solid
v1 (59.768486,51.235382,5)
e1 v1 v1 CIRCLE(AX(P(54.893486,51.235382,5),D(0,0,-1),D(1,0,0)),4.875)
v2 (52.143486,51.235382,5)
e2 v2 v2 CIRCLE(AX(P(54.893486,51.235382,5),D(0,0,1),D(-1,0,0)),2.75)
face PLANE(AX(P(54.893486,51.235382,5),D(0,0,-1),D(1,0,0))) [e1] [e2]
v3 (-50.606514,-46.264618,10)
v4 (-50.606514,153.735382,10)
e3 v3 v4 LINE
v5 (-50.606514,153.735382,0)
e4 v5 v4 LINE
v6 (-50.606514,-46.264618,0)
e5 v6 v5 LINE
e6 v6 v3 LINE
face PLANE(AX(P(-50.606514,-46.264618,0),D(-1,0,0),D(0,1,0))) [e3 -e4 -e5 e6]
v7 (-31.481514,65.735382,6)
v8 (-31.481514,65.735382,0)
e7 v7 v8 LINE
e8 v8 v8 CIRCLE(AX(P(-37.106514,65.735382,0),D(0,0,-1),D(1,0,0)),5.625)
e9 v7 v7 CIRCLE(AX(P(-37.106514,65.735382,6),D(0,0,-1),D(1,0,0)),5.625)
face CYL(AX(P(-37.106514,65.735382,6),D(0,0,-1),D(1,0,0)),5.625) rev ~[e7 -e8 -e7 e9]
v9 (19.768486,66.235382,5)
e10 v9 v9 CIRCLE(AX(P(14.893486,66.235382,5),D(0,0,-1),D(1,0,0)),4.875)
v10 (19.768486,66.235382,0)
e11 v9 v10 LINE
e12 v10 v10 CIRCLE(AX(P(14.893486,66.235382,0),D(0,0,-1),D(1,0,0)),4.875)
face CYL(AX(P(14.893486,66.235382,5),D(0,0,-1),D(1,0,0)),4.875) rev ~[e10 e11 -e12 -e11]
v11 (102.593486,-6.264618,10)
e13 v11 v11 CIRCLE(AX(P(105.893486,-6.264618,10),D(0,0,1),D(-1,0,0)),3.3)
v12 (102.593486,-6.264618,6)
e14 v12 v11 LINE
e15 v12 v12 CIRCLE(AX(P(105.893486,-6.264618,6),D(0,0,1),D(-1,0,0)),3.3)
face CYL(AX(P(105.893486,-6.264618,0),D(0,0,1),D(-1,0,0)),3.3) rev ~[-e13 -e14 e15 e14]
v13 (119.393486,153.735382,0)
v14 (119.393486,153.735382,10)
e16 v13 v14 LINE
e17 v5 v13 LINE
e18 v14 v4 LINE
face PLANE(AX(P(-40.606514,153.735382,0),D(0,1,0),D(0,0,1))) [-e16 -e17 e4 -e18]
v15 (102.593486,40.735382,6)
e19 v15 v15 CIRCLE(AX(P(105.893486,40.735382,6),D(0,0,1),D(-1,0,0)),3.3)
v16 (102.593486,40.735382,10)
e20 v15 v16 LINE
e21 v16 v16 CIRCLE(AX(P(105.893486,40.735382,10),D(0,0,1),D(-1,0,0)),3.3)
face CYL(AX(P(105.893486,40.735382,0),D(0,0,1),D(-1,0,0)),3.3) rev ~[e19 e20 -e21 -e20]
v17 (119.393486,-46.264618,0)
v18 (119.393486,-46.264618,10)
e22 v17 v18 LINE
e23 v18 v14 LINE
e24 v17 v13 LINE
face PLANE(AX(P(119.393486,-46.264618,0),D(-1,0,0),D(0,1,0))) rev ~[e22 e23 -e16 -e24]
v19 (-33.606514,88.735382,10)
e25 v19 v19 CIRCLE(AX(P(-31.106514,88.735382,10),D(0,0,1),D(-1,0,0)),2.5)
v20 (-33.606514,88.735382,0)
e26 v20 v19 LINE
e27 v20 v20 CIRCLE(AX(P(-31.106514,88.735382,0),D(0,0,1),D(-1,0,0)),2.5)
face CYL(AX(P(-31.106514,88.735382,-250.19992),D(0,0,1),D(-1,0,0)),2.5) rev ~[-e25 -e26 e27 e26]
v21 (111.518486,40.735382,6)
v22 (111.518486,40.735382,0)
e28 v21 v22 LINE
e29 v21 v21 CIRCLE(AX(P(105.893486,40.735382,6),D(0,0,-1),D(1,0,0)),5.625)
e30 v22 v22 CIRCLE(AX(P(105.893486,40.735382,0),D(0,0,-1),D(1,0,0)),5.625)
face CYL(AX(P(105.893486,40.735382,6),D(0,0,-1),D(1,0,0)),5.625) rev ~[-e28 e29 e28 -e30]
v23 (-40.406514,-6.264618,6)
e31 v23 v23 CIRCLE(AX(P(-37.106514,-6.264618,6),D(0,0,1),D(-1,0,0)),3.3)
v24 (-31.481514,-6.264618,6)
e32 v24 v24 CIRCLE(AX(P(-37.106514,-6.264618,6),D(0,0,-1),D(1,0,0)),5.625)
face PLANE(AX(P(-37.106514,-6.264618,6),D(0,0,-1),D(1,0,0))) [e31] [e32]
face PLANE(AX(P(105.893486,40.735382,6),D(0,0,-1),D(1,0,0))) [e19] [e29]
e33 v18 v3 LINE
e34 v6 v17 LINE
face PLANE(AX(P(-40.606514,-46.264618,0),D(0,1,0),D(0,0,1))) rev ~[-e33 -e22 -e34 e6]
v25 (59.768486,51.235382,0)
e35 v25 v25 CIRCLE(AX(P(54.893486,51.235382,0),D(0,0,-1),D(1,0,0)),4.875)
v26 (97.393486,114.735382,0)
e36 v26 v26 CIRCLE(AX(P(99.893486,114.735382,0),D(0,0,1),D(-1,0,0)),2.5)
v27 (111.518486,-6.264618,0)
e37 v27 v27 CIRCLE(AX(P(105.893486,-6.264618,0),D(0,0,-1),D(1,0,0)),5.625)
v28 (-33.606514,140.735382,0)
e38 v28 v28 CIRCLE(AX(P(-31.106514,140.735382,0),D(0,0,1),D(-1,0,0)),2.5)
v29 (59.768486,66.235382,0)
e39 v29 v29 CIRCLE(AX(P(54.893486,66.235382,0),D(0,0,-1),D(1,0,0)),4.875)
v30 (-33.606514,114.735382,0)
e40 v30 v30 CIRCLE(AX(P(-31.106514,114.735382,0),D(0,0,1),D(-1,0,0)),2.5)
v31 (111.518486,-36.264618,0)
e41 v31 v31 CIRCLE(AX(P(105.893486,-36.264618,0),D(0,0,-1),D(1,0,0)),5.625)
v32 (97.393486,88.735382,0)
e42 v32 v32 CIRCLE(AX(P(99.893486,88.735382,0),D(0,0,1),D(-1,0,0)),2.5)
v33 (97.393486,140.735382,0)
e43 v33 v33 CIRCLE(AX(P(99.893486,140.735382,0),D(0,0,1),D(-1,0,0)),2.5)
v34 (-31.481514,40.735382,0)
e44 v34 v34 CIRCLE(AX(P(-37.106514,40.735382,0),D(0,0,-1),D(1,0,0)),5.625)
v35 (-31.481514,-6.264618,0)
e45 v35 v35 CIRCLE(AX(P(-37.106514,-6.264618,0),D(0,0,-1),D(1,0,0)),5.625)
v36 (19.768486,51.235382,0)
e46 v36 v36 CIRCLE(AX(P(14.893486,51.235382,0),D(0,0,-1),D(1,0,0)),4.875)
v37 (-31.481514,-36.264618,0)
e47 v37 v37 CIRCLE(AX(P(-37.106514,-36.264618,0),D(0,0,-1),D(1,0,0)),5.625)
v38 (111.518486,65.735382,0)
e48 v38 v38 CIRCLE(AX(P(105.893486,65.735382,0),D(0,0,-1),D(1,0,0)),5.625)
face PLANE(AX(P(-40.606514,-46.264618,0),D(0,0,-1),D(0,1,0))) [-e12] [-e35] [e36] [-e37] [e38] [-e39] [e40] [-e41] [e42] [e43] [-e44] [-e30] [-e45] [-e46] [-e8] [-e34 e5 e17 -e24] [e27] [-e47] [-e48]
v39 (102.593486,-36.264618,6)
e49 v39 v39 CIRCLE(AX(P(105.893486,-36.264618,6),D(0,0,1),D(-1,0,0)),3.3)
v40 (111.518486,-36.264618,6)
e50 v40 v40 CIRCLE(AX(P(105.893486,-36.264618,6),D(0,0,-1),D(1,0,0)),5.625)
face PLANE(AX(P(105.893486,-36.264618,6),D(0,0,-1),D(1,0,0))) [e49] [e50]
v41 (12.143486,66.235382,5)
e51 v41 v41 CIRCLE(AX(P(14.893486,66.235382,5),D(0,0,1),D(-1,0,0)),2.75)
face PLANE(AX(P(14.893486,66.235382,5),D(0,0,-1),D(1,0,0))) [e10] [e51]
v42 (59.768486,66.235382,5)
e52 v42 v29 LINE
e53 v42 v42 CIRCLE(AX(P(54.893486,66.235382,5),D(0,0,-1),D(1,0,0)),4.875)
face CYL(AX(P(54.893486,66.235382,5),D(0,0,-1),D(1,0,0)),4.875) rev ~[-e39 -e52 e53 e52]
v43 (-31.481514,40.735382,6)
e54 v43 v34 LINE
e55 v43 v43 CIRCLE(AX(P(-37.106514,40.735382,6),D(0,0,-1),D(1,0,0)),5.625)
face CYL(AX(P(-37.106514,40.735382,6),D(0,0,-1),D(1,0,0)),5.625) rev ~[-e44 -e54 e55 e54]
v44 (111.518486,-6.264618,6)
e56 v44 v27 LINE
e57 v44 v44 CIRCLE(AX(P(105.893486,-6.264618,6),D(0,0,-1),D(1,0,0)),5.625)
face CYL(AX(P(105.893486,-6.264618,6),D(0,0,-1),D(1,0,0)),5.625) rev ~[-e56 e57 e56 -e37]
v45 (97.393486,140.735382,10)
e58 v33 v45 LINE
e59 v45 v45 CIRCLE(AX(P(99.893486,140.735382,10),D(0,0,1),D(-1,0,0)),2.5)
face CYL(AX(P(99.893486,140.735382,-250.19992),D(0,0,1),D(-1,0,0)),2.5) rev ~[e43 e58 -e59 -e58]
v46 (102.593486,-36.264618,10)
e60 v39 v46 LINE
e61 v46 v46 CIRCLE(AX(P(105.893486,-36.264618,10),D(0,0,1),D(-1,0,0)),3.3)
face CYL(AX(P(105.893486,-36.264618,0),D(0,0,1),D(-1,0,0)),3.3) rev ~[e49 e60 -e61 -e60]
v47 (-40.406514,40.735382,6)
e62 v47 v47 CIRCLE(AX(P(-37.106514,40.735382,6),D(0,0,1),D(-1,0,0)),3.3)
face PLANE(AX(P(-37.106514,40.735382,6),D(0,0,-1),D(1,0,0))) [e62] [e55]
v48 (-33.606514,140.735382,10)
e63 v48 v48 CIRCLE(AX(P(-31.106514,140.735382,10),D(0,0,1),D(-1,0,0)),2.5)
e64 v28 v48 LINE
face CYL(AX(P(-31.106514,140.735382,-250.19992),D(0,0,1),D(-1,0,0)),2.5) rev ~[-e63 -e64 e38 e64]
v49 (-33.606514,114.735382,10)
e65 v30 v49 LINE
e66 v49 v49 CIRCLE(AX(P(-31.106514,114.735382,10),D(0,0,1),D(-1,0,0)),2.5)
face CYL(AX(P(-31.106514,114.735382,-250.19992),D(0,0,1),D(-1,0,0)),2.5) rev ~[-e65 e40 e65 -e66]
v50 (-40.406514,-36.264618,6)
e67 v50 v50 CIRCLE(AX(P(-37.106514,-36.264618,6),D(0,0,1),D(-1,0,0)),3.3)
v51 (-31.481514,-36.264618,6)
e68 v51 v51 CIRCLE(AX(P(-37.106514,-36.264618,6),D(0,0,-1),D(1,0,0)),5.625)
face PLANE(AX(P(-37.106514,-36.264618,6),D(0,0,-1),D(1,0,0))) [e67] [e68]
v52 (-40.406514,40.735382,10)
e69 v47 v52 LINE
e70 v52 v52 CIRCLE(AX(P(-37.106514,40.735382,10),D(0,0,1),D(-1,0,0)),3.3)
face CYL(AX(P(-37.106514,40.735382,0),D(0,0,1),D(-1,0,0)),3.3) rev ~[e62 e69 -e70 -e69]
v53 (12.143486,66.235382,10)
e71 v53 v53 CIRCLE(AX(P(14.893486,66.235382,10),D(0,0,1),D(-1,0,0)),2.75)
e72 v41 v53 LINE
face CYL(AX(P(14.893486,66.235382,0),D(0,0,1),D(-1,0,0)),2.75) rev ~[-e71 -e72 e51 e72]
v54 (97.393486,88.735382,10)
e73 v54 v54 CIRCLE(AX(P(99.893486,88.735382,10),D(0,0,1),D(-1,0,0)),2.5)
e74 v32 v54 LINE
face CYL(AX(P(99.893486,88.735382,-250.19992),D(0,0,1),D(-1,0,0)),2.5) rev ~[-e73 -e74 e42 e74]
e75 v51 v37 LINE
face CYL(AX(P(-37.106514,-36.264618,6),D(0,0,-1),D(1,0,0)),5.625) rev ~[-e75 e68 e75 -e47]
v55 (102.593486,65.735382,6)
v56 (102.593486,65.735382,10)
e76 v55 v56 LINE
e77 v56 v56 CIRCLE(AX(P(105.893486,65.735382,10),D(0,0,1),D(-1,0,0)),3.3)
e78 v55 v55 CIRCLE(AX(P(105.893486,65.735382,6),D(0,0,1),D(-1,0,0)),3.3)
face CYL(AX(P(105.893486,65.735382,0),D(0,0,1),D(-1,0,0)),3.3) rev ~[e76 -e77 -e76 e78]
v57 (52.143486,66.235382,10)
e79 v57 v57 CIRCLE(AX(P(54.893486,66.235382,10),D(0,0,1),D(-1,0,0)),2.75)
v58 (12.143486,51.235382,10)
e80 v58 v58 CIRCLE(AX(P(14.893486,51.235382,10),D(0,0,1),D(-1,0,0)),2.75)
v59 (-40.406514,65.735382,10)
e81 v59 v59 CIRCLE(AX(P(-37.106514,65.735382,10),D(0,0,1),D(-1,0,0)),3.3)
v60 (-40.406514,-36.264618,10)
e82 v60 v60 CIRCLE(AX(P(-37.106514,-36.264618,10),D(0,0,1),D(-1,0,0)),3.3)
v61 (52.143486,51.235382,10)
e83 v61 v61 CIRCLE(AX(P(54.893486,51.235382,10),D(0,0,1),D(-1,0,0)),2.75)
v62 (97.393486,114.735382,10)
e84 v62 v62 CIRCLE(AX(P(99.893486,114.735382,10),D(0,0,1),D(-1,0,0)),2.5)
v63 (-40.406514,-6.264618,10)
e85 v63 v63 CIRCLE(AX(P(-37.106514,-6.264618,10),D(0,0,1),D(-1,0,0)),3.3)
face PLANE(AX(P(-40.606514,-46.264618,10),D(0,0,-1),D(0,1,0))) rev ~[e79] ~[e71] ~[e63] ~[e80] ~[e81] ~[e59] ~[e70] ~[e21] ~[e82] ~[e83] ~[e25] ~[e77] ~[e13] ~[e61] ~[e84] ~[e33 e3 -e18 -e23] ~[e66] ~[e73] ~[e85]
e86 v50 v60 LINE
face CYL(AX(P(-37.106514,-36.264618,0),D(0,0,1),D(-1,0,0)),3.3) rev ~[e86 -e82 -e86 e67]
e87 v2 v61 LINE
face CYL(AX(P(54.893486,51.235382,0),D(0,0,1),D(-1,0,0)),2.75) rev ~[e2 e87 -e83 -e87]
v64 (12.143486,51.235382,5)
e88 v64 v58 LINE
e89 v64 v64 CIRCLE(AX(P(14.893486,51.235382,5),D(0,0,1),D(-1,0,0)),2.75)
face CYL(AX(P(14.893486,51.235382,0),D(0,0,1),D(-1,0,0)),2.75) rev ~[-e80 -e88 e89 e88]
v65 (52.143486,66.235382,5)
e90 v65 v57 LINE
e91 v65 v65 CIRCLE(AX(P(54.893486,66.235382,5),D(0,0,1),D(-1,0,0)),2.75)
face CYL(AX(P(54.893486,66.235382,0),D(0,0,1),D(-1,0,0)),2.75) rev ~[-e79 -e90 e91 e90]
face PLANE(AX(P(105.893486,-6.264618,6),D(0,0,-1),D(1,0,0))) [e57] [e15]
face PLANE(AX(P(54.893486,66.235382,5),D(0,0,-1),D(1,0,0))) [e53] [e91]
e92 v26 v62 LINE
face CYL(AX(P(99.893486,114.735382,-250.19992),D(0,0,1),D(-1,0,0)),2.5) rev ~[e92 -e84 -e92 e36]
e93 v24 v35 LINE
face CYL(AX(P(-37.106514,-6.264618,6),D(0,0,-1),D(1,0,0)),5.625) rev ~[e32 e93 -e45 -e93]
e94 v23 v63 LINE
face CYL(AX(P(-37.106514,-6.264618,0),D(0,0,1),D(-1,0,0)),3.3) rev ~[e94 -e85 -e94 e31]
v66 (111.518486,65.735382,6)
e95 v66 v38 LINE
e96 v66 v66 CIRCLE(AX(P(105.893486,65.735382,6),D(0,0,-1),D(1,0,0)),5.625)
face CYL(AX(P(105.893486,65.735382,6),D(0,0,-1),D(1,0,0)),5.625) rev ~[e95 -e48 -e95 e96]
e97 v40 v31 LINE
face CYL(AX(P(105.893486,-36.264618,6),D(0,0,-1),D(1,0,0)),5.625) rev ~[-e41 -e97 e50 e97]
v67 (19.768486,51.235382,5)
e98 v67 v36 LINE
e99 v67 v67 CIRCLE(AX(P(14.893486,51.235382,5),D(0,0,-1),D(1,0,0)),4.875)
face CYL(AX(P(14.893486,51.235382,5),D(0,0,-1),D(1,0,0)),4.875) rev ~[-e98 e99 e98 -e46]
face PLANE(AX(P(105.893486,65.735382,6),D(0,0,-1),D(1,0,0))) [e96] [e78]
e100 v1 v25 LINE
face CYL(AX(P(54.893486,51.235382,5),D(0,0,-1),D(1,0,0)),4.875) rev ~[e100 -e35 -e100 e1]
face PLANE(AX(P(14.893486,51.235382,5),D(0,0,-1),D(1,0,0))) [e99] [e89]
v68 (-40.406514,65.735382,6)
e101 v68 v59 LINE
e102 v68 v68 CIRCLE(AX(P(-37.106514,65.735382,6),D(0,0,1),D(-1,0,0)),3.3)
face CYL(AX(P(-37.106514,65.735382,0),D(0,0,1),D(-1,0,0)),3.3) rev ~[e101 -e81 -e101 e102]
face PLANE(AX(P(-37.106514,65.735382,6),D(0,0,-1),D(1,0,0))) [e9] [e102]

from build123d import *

# Parameters (mm, degrees)
F0_W           = 150
F0_H           = 200
F1_DEPTH       = 10
F3_D           = 5
F5_DEPTH       = 10
F6_DEPTH       = 10
F7_D           = 6.6
F7_CBORE_D     = 11.25
F7_CBORE_DEPTH = 6
F8_D           = 5.5
F8_CBORE_D     = 9.75
F8_CBORE_DEPTH = 5


# Not quite as in the source:
# - a feature names something its author has since deleted; it is built from what else it names


with BuildPart() as f1:
    # F0 (on Top) → F1 (new body)
    with BuildSketch(Plane.XY):
        with Locations((34.3934863061, 53.7353821645)):
            Rectangle(F0_W, F0_H)
    extrude(amount=F1_DEPTH)

    # F3 (through all)
    with Locations(Plane(origin=(0, 0, 0), x_dir=(1, 0, 0), z_dir=(0, 0, -1))):
        with Locations((-31.1065136939, -140.7353821645), (-31.1065136939, -114.7353821645), (-31.1065136939, -88.7353821645), (99.8934863061, -88.7353821645), (99.8934863061, -114.7353821645), (99.8934863061, -140.7353821645)):
            Hole(F3_D / 2)

    # F5 (add): a face of the model
    f5_faces = [f1.faces().sort_by_distance(p)[0] for p in [
        (109.3934863061, 53.7353821645, 5),
    ]]
    extrude(f5_faces, amount=F5_DEPTH)

    # F6 (add): a face of the model
    f6_faces = [f1.faces().sort_by_distance(p)[0] for p in [
        (-40.6065136939, 53.7353821645, 5),
    ]]
    extrude(f6_faces, amount=F6_DEPTH)

    # F7 (through all)
    with Locations(Plane(origin=(0, 0, 0), x_dir=(1, 0, 0), z_dir=(0, 0, -1))):
        with Locations((-37.1065136939, 36.2646178355), (-37.1065136939, 6.2646178355), (105.8934863061, 36.2646178355), (105.8934863061, 6.2646178355), (105.8934863061, -40.7353821645), (105.8934863061, -65.7353821645), (-37.1065136939, -65.7353821645), (-37.1065136939, -40.7353821645)):
            CounterBoreHole(F7_D / 2, F7_CBORE_D / 2, F7_CBORE_DEPTH)

    # F8 (through all)
    with Locations(Plane(origin=(0, 0, 0), x_dir=(1, 0, 0), z_dir=(0, 0, -1))):
        with Locations((54.8934863061, -51.2353821645), (54.8934863061, -66.2353821645), (14.8934863061, -51.2353821645), (14.8934863061, -66.2353821645)):
            CounterBoreHole(F8_D / 2, F8_CBORE_D / 2, F8_CBORE_DEPTH)


solid = f1.part
